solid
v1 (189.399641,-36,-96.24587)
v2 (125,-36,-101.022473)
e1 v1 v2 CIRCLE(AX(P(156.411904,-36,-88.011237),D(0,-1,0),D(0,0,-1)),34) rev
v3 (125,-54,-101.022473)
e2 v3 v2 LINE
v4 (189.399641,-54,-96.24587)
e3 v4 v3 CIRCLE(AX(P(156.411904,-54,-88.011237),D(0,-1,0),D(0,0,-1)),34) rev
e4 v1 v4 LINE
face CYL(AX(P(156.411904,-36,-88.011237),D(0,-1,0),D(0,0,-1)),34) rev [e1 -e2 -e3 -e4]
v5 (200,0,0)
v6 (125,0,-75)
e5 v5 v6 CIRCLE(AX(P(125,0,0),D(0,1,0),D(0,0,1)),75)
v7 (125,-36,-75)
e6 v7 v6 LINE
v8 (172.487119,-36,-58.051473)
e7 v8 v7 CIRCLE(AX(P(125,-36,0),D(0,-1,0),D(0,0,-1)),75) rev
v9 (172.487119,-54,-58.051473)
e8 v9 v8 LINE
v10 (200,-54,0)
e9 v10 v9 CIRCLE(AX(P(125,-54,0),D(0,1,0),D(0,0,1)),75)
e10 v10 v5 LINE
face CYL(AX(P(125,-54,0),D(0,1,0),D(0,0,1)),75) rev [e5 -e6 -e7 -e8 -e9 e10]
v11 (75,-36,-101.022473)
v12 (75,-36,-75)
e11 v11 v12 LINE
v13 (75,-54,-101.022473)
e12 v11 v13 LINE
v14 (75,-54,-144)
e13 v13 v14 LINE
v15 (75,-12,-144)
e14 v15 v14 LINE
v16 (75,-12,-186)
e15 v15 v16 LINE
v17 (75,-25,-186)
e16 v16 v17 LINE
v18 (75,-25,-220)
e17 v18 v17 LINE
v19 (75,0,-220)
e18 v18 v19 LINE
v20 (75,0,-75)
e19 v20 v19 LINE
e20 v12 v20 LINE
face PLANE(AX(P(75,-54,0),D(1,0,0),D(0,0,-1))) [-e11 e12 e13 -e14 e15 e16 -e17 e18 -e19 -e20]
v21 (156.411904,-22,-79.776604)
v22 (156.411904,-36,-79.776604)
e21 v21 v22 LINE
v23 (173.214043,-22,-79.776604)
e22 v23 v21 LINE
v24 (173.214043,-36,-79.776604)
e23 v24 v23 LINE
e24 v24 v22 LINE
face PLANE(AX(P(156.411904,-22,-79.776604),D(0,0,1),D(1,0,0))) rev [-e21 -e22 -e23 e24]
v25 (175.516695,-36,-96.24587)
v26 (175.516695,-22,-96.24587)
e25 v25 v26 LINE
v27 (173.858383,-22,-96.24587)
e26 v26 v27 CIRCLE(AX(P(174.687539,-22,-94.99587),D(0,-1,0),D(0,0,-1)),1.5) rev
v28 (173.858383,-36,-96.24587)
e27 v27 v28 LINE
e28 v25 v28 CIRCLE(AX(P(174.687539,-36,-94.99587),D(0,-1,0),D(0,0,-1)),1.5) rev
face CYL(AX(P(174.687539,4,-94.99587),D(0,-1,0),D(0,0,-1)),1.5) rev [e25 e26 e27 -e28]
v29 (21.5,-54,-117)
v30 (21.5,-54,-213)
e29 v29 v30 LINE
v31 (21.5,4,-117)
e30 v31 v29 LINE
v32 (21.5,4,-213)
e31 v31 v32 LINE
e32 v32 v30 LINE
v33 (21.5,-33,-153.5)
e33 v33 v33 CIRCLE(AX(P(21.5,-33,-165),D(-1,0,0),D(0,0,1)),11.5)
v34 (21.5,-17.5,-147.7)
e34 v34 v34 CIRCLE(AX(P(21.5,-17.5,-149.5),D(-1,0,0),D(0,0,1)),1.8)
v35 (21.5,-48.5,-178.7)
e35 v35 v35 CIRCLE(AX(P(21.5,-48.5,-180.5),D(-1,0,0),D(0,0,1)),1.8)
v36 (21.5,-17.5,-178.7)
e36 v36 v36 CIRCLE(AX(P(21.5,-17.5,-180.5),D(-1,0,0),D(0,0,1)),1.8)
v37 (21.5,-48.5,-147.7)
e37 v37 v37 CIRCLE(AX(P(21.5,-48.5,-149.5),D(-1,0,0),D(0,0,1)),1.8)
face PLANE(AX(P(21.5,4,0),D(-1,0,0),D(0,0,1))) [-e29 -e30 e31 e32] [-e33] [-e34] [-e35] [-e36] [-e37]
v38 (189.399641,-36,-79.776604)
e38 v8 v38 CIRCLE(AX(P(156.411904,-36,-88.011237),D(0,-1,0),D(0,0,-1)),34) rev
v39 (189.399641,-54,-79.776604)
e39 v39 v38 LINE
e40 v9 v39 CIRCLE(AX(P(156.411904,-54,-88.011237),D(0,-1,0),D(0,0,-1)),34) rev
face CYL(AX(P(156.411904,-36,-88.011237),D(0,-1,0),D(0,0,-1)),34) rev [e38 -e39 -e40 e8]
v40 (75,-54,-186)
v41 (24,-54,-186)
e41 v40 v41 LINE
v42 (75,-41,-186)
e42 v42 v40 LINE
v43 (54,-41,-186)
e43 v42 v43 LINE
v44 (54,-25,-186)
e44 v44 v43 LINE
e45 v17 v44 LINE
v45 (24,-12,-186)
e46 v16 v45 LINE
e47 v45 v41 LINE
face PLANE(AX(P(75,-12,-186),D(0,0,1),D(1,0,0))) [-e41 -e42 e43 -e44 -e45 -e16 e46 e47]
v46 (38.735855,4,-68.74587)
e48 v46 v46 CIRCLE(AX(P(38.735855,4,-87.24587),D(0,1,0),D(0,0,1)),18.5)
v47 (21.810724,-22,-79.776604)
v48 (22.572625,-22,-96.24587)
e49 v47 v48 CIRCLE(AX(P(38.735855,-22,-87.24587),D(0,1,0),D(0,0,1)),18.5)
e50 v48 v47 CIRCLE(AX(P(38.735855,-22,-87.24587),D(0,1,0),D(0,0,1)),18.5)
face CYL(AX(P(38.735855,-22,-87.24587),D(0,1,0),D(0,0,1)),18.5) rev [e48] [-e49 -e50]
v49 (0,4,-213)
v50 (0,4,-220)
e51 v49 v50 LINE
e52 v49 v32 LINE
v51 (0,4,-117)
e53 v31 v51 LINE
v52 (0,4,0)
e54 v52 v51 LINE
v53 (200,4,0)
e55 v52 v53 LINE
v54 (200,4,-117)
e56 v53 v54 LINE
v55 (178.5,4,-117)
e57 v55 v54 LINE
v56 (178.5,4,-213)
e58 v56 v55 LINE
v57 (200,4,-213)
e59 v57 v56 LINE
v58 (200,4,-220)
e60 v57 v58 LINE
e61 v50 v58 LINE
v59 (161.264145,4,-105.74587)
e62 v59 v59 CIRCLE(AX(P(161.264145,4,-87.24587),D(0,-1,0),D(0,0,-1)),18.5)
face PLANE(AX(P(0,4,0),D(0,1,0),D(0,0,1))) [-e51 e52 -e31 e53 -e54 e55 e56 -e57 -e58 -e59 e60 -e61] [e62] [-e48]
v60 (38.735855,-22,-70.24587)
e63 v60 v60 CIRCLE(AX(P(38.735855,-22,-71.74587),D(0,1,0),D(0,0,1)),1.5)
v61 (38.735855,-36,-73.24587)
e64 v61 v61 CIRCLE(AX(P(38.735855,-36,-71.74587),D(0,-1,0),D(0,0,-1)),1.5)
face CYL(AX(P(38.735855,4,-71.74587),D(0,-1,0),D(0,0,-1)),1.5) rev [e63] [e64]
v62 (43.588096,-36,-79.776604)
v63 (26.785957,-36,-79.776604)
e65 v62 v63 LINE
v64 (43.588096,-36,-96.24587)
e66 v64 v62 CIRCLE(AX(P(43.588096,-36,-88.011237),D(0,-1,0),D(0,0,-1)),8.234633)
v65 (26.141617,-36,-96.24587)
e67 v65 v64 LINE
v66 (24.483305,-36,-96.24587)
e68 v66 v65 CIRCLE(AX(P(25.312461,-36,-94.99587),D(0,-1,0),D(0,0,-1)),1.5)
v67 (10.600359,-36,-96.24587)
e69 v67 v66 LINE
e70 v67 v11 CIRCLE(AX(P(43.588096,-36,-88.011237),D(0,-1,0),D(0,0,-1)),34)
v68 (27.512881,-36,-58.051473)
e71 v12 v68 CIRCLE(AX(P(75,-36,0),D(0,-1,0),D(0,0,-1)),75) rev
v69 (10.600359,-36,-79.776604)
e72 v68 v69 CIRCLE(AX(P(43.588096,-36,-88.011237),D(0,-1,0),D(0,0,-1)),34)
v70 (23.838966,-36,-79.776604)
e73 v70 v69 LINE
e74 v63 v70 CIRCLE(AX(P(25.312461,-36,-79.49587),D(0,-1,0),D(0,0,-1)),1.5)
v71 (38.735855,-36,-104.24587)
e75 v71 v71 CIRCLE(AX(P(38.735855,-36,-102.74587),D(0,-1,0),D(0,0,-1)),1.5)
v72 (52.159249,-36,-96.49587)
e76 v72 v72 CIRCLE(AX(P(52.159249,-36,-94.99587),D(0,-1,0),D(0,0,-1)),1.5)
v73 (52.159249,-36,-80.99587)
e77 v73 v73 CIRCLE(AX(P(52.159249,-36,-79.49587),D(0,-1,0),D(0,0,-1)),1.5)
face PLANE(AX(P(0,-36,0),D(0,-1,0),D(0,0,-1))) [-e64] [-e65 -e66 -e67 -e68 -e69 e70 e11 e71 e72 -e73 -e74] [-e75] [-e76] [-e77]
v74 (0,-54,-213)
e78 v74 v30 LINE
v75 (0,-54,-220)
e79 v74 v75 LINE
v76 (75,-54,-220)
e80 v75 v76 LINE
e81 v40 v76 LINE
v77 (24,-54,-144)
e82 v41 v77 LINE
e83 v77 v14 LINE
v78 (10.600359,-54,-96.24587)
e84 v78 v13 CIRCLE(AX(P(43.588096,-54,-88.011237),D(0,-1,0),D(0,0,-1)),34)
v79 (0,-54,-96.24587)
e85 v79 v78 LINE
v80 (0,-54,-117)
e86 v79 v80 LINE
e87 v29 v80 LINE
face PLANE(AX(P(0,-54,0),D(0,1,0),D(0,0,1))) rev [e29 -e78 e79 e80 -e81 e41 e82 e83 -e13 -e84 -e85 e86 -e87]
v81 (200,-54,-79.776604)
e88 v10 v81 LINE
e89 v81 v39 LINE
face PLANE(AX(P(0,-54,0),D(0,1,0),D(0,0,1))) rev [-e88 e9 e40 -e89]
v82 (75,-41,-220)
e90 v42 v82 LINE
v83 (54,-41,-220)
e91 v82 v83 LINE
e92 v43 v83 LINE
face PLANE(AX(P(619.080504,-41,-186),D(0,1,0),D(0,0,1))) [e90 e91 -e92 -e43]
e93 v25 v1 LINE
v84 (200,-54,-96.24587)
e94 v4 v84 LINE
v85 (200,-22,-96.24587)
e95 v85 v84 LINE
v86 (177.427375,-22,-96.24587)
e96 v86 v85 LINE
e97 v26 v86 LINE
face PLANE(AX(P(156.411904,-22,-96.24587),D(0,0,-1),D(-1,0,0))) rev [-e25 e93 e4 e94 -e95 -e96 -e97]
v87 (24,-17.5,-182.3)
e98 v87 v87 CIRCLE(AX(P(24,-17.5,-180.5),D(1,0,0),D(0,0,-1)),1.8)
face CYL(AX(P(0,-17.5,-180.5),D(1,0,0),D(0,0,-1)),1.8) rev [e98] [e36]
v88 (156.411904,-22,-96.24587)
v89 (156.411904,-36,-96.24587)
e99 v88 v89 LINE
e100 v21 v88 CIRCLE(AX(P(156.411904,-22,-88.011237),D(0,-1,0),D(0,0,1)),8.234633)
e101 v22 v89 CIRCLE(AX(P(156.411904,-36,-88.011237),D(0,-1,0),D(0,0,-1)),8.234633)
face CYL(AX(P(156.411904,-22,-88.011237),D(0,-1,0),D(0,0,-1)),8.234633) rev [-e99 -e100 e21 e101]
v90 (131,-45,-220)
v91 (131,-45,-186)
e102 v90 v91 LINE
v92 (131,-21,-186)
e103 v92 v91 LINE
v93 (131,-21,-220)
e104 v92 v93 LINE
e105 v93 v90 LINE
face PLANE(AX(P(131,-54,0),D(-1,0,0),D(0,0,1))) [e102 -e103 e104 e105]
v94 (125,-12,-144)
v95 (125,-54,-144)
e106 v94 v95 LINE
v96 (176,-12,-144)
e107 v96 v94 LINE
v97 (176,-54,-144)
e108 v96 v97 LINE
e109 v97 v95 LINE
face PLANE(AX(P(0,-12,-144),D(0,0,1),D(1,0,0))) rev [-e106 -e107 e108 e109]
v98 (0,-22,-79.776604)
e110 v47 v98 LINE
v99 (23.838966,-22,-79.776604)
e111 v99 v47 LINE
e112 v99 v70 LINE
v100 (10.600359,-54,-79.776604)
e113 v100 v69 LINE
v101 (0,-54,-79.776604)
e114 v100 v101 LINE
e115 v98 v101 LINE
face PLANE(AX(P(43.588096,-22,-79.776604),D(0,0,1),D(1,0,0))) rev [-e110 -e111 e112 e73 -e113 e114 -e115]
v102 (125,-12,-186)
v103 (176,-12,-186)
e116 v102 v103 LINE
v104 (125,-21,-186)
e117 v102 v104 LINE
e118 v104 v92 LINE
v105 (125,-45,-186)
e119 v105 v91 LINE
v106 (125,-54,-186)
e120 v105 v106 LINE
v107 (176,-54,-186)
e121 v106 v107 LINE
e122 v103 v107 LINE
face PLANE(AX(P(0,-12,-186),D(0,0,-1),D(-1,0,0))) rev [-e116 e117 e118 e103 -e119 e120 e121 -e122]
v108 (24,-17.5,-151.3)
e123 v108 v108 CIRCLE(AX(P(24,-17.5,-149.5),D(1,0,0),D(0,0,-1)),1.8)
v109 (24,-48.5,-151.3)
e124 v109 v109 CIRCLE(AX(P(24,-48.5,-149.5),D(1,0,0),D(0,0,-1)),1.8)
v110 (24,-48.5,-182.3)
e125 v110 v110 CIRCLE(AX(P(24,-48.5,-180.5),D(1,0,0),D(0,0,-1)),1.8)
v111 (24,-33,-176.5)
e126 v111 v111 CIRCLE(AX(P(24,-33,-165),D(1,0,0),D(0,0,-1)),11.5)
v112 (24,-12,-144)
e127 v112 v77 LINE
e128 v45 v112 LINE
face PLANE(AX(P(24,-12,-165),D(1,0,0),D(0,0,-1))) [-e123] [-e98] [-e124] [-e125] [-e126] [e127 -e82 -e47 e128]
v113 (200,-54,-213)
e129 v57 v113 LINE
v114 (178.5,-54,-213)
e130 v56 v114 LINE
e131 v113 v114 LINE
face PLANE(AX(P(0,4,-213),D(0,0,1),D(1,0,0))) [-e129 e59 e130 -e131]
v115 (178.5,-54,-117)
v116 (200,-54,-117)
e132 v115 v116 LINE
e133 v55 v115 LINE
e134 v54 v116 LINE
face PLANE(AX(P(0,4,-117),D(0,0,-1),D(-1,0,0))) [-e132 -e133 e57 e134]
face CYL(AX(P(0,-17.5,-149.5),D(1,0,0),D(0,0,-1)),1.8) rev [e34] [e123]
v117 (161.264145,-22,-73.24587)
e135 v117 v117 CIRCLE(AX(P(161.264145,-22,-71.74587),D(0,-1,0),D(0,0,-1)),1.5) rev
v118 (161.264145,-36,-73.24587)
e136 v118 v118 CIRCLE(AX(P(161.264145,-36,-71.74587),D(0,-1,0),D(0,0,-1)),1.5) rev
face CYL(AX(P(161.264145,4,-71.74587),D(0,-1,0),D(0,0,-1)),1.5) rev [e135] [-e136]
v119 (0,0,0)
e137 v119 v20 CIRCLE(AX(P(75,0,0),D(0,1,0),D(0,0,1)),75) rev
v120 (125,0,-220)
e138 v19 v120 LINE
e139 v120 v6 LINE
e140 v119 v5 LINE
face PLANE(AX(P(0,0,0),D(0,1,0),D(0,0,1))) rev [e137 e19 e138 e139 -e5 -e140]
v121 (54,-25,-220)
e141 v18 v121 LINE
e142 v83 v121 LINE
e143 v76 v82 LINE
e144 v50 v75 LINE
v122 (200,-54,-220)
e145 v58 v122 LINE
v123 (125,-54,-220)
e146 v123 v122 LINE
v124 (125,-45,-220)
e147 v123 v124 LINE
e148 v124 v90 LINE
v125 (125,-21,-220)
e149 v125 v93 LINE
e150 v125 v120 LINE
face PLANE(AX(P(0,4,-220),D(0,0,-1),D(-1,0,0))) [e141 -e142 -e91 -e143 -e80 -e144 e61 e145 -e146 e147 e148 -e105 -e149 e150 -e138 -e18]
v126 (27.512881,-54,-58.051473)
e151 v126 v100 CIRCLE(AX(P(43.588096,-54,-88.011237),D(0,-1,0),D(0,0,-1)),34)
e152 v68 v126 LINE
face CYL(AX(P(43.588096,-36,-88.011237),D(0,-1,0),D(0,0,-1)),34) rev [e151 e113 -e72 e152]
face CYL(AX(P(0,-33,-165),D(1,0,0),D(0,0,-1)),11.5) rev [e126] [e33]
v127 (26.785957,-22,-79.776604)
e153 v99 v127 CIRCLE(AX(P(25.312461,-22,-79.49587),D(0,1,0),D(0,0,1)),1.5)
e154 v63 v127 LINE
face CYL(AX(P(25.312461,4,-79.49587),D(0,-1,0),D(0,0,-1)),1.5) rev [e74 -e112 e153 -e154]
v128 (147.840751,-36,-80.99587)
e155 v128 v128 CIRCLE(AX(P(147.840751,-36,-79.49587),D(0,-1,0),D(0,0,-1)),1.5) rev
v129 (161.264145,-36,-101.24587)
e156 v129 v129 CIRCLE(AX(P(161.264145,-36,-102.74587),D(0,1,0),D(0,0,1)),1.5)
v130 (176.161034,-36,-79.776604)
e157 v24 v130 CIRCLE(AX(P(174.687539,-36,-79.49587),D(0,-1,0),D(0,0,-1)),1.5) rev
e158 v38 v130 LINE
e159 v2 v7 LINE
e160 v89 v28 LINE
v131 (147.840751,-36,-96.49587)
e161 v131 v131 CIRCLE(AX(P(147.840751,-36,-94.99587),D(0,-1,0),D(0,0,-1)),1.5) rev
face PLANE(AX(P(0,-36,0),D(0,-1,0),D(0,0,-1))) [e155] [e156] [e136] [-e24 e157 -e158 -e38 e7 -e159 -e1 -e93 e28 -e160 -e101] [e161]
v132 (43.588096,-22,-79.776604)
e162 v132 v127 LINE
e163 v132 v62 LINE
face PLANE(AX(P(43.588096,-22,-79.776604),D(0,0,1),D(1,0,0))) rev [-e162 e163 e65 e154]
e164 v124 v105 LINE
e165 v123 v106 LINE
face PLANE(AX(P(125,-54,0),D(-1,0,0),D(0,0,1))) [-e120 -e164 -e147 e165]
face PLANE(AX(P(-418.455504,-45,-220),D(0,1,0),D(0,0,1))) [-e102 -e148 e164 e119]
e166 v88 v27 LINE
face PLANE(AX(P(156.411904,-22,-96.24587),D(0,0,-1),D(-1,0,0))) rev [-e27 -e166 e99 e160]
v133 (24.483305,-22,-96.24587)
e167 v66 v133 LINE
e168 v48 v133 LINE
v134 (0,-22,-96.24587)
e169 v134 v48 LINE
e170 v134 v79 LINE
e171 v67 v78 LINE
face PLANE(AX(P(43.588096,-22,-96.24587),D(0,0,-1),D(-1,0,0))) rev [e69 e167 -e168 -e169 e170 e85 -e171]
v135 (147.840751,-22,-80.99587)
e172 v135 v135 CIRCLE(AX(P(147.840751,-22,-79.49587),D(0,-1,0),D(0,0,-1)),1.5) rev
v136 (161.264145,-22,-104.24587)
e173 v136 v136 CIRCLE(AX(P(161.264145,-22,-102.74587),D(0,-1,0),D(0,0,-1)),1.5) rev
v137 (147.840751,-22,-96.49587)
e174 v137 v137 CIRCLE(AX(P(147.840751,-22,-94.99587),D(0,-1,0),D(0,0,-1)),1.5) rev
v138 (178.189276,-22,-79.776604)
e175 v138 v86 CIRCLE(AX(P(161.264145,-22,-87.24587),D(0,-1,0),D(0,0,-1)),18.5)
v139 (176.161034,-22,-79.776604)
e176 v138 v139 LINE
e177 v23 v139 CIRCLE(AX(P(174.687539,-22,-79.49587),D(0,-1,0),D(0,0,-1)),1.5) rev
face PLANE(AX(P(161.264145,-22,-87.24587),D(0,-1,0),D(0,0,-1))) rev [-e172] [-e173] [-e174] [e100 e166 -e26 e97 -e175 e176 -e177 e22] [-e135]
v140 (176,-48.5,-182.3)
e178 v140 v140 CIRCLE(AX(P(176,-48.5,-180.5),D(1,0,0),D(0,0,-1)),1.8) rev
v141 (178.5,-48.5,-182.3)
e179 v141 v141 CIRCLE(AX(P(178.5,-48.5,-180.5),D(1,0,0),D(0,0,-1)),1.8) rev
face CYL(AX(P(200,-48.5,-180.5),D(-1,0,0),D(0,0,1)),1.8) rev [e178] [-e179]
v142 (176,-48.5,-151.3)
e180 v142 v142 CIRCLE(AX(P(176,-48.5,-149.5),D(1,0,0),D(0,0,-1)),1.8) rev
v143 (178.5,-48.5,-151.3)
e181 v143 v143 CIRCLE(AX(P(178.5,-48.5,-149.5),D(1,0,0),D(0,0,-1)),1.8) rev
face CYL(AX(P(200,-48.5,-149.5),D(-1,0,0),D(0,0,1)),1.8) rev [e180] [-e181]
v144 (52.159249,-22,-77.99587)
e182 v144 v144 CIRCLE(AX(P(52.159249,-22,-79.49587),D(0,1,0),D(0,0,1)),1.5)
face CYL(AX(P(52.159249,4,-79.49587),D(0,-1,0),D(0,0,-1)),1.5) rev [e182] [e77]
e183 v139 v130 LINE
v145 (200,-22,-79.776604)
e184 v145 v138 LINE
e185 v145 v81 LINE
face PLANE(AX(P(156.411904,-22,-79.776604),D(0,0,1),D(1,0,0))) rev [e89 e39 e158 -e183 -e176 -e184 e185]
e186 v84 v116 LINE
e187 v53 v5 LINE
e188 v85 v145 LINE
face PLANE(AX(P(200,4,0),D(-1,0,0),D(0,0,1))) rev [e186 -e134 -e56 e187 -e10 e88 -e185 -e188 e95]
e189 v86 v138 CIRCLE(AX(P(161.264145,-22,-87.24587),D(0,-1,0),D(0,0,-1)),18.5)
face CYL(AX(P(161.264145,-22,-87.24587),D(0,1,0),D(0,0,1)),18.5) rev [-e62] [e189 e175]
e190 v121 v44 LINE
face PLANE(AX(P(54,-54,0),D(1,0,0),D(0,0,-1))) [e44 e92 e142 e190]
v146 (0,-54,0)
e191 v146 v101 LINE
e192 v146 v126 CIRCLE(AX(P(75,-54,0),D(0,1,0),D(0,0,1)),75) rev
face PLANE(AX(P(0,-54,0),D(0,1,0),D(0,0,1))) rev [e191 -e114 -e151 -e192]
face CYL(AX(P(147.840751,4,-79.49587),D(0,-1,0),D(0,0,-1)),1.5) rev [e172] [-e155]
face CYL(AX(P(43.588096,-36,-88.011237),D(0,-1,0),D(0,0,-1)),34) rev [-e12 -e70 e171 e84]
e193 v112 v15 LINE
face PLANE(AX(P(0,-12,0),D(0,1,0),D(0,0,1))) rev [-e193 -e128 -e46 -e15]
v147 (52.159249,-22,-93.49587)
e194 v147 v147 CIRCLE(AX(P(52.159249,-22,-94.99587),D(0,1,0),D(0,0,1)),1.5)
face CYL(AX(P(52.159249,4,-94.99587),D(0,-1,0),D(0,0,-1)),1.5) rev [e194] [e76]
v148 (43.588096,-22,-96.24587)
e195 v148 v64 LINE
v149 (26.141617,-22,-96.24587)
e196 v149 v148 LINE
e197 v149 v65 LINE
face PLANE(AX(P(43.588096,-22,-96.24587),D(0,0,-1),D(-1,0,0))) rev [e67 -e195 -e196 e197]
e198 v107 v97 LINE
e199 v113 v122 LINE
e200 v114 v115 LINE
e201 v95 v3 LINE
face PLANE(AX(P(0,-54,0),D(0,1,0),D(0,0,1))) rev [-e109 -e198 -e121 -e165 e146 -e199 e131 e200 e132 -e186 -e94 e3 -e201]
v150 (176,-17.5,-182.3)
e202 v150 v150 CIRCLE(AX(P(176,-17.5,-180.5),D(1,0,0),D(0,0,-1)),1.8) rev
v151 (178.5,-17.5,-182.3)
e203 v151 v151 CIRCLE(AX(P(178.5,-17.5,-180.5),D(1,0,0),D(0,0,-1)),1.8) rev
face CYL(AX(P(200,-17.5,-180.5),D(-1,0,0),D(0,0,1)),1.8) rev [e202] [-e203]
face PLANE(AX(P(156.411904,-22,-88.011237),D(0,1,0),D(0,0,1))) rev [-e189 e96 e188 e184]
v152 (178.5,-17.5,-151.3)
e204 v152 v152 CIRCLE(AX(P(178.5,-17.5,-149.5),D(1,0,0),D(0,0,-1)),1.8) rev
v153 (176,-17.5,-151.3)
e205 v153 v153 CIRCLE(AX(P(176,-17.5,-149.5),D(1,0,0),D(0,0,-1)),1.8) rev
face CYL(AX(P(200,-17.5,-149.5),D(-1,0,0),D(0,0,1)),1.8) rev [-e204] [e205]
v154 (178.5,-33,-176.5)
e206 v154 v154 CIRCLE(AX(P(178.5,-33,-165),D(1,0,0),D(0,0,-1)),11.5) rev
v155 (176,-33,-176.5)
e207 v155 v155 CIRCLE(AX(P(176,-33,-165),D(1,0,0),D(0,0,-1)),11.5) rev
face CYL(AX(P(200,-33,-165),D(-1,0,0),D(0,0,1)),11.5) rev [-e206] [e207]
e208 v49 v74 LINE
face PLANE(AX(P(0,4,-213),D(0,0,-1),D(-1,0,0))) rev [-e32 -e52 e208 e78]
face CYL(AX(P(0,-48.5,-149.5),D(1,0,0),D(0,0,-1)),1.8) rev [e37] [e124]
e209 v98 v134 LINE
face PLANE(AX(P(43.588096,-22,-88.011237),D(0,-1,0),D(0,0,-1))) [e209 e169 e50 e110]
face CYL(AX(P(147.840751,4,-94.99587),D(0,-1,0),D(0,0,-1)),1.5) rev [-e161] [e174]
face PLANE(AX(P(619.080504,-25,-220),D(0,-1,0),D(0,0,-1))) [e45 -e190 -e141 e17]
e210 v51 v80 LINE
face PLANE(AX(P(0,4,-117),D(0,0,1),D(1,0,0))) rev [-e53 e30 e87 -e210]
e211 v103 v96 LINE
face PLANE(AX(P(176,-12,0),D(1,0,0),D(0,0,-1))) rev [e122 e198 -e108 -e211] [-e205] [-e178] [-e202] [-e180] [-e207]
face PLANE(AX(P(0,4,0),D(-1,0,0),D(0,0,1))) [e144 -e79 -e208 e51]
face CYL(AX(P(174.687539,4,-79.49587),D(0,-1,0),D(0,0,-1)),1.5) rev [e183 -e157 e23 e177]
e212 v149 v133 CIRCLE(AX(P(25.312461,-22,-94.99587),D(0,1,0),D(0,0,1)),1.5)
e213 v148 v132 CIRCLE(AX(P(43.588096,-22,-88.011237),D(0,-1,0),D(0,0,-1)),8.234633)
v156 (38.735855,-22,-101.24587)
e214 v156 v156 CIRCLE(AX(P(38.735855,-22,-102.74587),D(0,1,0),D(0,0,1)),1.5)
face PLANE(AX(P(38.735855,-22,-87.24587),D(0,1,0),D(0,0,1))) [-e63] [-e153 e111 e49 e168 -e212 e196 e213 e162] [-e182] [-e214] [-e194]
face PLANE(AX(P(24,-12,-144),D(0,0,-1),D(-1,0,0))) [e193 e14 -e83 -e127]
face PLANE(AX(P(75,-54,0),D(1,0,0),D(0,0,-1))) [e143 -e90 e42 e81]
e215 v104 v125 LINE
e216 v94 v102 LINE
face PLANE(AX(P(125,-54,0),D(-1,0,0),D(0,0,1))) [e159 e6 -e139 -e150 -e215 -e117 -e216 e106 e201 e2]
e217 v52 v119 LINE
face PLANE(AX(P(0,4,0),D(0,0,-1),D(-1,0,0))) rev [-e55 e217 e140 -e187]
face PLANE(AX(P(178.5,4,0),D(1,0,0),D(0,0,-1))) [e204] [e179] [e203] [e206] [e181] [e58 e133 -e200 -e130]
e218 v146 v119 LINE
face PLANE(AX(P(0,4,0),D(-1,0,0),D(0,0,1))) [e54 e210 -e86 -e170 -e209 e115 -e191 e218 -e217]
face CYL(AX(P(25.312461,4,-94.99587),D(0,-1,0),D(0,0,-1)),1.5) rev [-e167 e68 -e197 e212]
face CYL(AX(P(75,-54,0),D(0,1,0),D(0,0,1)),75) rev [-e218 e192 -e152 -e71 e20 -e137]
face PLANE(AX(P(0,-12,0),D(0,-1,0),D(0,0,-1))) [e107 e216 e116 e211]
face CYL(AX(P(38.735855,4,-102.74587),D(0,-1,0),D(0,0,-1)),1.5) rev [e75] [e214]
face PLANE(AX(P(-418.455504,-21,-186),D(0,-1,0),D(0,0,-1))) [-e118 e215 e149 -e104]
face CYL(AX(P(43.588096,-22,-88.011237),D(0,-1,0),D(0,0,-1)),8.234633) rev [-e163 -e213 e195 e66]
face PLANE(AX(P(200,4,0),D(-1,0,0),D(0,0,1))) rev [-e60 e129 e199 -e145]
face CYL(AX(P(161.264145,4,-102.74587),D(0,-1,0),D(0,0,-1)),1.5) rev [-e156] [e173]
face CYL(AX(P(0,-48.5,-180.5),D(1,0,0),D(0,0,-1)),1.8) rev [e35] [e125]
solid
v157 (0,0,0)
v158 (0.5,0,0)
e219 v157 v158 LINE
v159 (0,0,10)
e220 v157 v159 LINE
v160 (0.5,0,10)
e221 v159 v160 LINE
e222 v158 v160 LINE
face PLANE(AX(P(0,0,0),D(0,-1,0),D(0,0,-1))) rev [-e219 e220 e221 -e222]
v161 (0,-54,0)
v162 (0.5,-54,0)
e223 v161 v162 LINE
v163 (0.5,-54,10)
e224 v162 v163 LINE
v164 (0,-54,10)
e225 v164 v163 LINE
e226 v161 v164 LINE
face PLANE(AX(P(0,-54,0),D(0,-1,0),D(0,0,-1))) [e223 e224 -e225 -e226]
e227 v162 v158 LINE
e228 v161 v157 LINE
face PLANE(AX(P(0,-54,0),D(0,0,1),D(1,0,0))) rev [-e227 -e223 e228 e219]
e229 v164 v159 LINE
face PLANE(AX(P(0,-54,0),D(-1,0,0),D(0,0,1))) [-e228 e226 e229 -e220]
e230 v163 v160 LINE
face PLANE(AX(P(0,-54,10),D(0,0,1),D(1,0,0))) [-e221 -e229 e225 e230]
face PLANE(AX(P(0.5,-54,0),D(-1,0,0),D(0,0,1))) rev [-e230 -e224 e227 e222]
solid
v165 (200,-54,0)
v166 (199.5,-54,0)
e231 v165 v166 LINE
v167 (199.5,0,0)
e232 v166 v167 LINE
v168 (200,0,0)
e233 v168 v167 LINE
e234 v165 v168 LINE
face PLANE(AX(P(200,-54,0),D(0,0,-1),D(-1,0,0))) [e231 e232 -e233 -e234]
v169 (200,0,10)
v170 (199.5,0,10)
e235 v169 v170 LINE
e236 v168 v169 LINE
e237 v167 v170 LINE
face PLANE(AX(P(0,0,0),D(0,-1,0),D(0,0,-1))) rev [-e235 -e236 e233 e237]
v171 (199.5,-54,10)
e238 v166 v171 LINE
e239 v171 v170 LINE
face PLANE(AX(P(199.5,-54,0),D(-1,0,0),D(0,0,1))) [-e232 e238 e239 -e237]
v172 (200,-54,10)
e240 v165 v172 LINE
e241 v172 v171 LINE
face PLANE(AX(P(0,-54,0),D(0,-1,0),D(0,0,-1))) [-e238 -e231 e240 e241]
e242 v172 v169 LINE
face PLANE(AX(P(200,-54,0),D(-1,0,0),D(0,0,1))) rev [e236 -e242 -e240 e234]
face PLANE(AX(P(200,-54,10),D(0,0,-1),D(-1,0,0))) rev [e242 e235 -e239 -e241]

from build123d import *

# Parameters (mm, degrees)
SKETCH_1_W              = 200
SKETCH_1_H              = 220
EXTRUDE_1_DEPTH         = 4
EXTRUDE_2_DEPTH         = 54
SKETCH_1_5_W            = 0.5
SKETCH_1_5_H            = 10
EXTRUDE_3_DEPTH         = 54
EXTRUDE_3_2_DEPTH       = 54
CUT_EXTRUDE_2_DEPTH     = 303.925733473
CUT_EXTRUDE_3_DEPTH     = 42
SKETCH_7_R              = 1.8
SKETCH_7_R_2            = 11.5
CUT_EXTRUDE_4_DEPTH     = 287.865822293
MIRROR_START            = 176
MIRROR_1_OUTLINE_R      = 1.8
MIRROR_1_OUTLINE_R_2    = 11.5
MIRROR_1_DEPTH          = 2.5
CUT_EXTRUDE_START       = -21
CUT_EXTRUDE_5_OUTLINE_W = 34
CUT_EXTRUDE_5_OUTLINE_H = 16
CUT_EXTRUDE_5_DEPTH     = 21
CUT_EXTRUDE_START_2     = -6
CUT_EXTRUDE_6_OUTLINE_W = 34
CUT_EXTRUDE_6_OUTLINE_H = 24
CUT_EXTRUDE_6_DEPTH     = 6
SKETCH_11_R             = 34
CUT_EXTRUDE_7_DEPTH     = 18
CUT_EXTRUDE_8_DEPTH     = 32
SKETCH_15_R             = 18.5
CUT_EXTRUDE_11_DEPTH    = 26
SKETCH_17_R             = 1.5
CUT_EXTRUDE_14_DEPTH    = 301


# Read off the part's stored shape, not the designer's step: 镜向1, 切除-拉伸5, 切除-拉伸6
with BuildPart() as part:
    # 草图1 → 凸台-拉伸1 (new body)
    with BuildSketch(Plane(origin=(0, 0, 0), x_dir=(1, 0, 0), z_dir=(0, 1, 0))):
        with Locations((100, 110)):
            Rectangle(SKETCH_1_W, SKETCH_1_H)
    extrude(amount=EXTRUDE_1_DEPTH)

    # 草图1<4> → 凸台-拉伸2 (add)
    with BuildSketch(Plane(origin=(0, 0, 0), x_dir=(1, 0, 0), z_dir=(0, 1, 0))):
        with BuildLine():
            Line((0, 220), (0, 0))
            ThreePointArc((0, 0), (21.966991411, 53.033008589), (75, 75))
            Line((75, 75), (75, 220))
            Line((75, 220), (0, 220))
        make_face()
        with BuildLine():
            Line((125, 220), (125, 75))
            ThreePointArc((125, 75), (178.033008589, 53.033008589), (200, 0))
            Line((200, 0), (200, 220))
            Line((200, 220), (125, 220))
        make_face()
    extrude(amount=-EXTRUDE_2_DEPTH)

    # 草图3 → 切除-拉伸2 (cut, through all)
    with BuildSketch(Plane.XZ.offset(54)):
        Polygon((21.5, -186), (21.5, -165), (21.5, -144), (21.5, -117), (0, -117), (0, -213), (21.5, -213), align=None)
        Polygon((178.5, -117), (200, -117), (200, -213), (178.5, -213), (178.5, -165), align=None)
    extrude(amount=-CUT_EXTRUDE_2_DEPTH, mode=Mode.SUBTRACT)

    # 草图5 → 切除-拉伸3 (cut)
    with BuildSketch(Plane.XZ.offset(54)):
        Polygon((176, -165), (176, -144), (125, -144), (125, -186), (176, -186), align=None)
        Polygon((24, -165), (24, -144), (75, -144), (75, -186), (24, -186), align=None)
    extrude(amount=-CUT_EXTRUDE_3_DEPTH, mode=Mode.SUBTRACT)

    # 草图7 → 切除-拉伸4 (cut, through all)
    with BuildSketch(Plane(origin=(24, 0, 0), x_dir=(0, 0, -1), z_dir=(1, 0, 0))):
        with Locations((180.5, -17.5)):
            Circle(SKETCH_7_R)
        with Locations((149.5, -17.5)):
            Circle(SKETCH_7_R)
        with Locations((165, -33)):
            Circle(SKETCH_7_R_2)
        with Locations((180.5, -48.5)):
            Circle(SKETCH_7_R)
        with Locations((149.5, -48.5)):
            Circle(SKETCH_7_R)
    extrude(amount=-CUT_EXTRUDE_4_DEPTH, mode=Mode.SUBTRACT)

    # 镜向1 outline → 镜向1 (cut)
    with BuildSketch(Plane.YZ.offset(MIRROR_START)):
        with Locations((-17.5, -180.5)):
            Circle(MIRROR_1_OUTLINE_R)
        with Locations((-17.5, -149.5)):
            Circle(MIRROR_1_OUTLINE_R)
        with Locations((-33, -165)):
            Circle(MIRROR_1_OUTLINE_R_2)
        with Locations((-48.5, -180.5)):
            Circle(MIRROR_1_OUTLINE_R)
        with Locations((-48.5, -149.5)):
            Circle(MIRROR_1_OUTLINE_R)
    extrude(amount=MIRROR_1_DEPTH, mode=Mode.SUBTRACT)

    # 切除-拉伸5 outline → 切除-拉伸5 (cut)
    with BuildSketch(Plane(origin=(75, 0, 0), x_dir=(0, 0, -1), z_dir=(1, 0, 0)).offset(CUT_EXTRUDE_START)):
        with Locations((203, -33)):
            Rectangle(CUT_EXTRUDE_5_OUTLINE_W, CUT_EXTRUDE_5_OUTLINE_H)
    extrude(amount=CUT_EXTRUDE_5_DEPTH, mode=Mode.SUBTRACT)

    # 切除-拉伸6 outline → 切除-拉伸6 (cut)
    with BuildSketch(Plane.ZY.offset(-125).offset(CUT_EXTRUDE_START_2)):
        with Locations((-203, -33)):
            Rectangle(CUT_EXTRUDE_6_OUTLINE_W, CUT_EXTRUDE_6_OUTLINE_H)
    extrude(amount=CUT_EXTRUDE_6_DEPTH, mode=Mode.SUBTRACT)

    # 草图11 → 切除-拉伸7 (cut)
    with BuildSketch(Plane.XZ.offset(54)):
        with Locations((43.588095895, -88.0112367)):
            Circle(SKETCH_11_R)
        with Locations((156.411904105, -88.0112367)):
            Circle(SKETCH_11_R)
    extrude(amount=-CUT_EXTRUDE_7_DEPTH, mode=Mode.SUBTRACT)

    # 草图12 → 切除-拉伸8 (cut)
    with BuildSketch(Plane.XZ.offset(54)):
        with BuildLine():
            Line((43.588095895, -79.776603565), (0, -79.776603565))
            Line((0, -79.776603565), (0, -96.245869836))
            Line((0, -96.245869836), (43.588095895, -96.245869836))
            ThreePointArc((43.588095895, -96.245869836), (51.82272903, -88.0112367), (43.588095895, -79.776603565))
        make_face()
        with BuildLine():
            Line((200, -79.776603565), (200, -96.245869836))
            Line((200, -96.245869836), (156.411904105, -96.245869836))
            ThreePointArc((156.411904105, -96.245869836), (148.17727097, -88.0112367), (156.411904105, -79.776603565))
            Line((156.411904105, -79.776603565), (200, -79.776603565))
        make_face()
    extrude(amount=-CUT_EXTRUDE_8_DEPTH, mode=Mode.SUBTRACT)

    # 草图15 → 切除-拉伸11 (cut)
    with BuildSketch(Plane(origin=(0, 4, 0), x_dir=(1, 0, 0), z_dir=(0, 1, 0))):
        with Locations(Location((38.73585496, 87.245869836, 0), (0, 0, 270))):
            Circle(SKETCH_15_R)
        with Locations(Location((161.26414504, 87.245869836, 0), (0, 0, 336.187548677))):
            Circle(SKETCH_15_R)
    extrude(amount=-CUT_EXTRUDE_11_DEPTH, mode=Mode.SUBTRACT)

    # 草图17 → 切除-拉伸14 (cut, through all)
    with BuildSketch(Plane.XZ.offset(36)):
        with Locations((25.312461201, -79.495869836)):
            Circle(SKETCH_17_R)
        with Locations(Location((38.73585496, -71.745869836, 0), (0, 0, 270))):
            Circle(SKETCH_17_R)
        with Locations(Location((52.159248718, -79.495869836, 0), (0, 0, 270))):
            Circle(SKETCH_17_R)
        with Locations(Location((52.159248718, -94.995869836, 0), (0, 0, 270))):
            Circle(SKETCH_17_R)
        with Locations(Location((38.73585496, -102.745869836, 0), (0, 0, 270))):
            Circle(SKETCH_17_R)
        with Locations((25.312461201, -94.995869836)):
            Circle(SKETCH_17_R)
        with Locations((174.687538799, -94.995869836)):
            Circle(SKETCH_17_R)
        with Locations(Location((161.26414504, -102.745869836, 0), (0, 0, 270))):
            Circle(SKETCH_17_R)
        with Locations(Location((147.840751282, -94.995869836, 0), (0, 0, 270))):
            Circle(SKETCH_17_R)
        with Locations(Location((147.840751282, -79.495869836, 0), (0, 0, 270))):
            Circle(SKETCH_17_R)
        with Locations(Location((161.26414504, -71.745869836, 0), (0, 0, 270))):
            Circle(SKETCH_17_R)
        with Locations((174.687538799, -79.495869836)):
            Circle(SKETCH_17_R)
    extrude(amount=-CUT_EXTRUDE_14_DEPTH, mode=Mode.SUBTRACT)


with BuildPart() as body_2:
    # 草图1<5> → 凸台-拉伸3 (new body)
    with BuildSketch(Plane(origin=(0, 0, 0), x_dir=(1, 0, 0), z_dir=(0, 1, 0))):
        with Locations((199.75, -5)):
            Rectangle(SKETCH_1_5_W, SKETCH_1_5_H)
    extrude(amount=-EXTRUDE_3_DEPTH)


with BuildPart() as body_3:
    # 草图1<5> → Extrude 3 2 (new body)
    with BuildSketch(Plane(origin=(0, 0, 0), x_dir=(1, 0, 0), z_dir=(0, 1, 0))):
        with Locations((0.25, -5)):
            Rectangle(SKETCH_1_5_W, SKETCH_1_5_H)
    extrude(amount=-EXTRUDE_3_2_DEPTH)


solid = Compound([part.part, body_2.part, body_3.part])
